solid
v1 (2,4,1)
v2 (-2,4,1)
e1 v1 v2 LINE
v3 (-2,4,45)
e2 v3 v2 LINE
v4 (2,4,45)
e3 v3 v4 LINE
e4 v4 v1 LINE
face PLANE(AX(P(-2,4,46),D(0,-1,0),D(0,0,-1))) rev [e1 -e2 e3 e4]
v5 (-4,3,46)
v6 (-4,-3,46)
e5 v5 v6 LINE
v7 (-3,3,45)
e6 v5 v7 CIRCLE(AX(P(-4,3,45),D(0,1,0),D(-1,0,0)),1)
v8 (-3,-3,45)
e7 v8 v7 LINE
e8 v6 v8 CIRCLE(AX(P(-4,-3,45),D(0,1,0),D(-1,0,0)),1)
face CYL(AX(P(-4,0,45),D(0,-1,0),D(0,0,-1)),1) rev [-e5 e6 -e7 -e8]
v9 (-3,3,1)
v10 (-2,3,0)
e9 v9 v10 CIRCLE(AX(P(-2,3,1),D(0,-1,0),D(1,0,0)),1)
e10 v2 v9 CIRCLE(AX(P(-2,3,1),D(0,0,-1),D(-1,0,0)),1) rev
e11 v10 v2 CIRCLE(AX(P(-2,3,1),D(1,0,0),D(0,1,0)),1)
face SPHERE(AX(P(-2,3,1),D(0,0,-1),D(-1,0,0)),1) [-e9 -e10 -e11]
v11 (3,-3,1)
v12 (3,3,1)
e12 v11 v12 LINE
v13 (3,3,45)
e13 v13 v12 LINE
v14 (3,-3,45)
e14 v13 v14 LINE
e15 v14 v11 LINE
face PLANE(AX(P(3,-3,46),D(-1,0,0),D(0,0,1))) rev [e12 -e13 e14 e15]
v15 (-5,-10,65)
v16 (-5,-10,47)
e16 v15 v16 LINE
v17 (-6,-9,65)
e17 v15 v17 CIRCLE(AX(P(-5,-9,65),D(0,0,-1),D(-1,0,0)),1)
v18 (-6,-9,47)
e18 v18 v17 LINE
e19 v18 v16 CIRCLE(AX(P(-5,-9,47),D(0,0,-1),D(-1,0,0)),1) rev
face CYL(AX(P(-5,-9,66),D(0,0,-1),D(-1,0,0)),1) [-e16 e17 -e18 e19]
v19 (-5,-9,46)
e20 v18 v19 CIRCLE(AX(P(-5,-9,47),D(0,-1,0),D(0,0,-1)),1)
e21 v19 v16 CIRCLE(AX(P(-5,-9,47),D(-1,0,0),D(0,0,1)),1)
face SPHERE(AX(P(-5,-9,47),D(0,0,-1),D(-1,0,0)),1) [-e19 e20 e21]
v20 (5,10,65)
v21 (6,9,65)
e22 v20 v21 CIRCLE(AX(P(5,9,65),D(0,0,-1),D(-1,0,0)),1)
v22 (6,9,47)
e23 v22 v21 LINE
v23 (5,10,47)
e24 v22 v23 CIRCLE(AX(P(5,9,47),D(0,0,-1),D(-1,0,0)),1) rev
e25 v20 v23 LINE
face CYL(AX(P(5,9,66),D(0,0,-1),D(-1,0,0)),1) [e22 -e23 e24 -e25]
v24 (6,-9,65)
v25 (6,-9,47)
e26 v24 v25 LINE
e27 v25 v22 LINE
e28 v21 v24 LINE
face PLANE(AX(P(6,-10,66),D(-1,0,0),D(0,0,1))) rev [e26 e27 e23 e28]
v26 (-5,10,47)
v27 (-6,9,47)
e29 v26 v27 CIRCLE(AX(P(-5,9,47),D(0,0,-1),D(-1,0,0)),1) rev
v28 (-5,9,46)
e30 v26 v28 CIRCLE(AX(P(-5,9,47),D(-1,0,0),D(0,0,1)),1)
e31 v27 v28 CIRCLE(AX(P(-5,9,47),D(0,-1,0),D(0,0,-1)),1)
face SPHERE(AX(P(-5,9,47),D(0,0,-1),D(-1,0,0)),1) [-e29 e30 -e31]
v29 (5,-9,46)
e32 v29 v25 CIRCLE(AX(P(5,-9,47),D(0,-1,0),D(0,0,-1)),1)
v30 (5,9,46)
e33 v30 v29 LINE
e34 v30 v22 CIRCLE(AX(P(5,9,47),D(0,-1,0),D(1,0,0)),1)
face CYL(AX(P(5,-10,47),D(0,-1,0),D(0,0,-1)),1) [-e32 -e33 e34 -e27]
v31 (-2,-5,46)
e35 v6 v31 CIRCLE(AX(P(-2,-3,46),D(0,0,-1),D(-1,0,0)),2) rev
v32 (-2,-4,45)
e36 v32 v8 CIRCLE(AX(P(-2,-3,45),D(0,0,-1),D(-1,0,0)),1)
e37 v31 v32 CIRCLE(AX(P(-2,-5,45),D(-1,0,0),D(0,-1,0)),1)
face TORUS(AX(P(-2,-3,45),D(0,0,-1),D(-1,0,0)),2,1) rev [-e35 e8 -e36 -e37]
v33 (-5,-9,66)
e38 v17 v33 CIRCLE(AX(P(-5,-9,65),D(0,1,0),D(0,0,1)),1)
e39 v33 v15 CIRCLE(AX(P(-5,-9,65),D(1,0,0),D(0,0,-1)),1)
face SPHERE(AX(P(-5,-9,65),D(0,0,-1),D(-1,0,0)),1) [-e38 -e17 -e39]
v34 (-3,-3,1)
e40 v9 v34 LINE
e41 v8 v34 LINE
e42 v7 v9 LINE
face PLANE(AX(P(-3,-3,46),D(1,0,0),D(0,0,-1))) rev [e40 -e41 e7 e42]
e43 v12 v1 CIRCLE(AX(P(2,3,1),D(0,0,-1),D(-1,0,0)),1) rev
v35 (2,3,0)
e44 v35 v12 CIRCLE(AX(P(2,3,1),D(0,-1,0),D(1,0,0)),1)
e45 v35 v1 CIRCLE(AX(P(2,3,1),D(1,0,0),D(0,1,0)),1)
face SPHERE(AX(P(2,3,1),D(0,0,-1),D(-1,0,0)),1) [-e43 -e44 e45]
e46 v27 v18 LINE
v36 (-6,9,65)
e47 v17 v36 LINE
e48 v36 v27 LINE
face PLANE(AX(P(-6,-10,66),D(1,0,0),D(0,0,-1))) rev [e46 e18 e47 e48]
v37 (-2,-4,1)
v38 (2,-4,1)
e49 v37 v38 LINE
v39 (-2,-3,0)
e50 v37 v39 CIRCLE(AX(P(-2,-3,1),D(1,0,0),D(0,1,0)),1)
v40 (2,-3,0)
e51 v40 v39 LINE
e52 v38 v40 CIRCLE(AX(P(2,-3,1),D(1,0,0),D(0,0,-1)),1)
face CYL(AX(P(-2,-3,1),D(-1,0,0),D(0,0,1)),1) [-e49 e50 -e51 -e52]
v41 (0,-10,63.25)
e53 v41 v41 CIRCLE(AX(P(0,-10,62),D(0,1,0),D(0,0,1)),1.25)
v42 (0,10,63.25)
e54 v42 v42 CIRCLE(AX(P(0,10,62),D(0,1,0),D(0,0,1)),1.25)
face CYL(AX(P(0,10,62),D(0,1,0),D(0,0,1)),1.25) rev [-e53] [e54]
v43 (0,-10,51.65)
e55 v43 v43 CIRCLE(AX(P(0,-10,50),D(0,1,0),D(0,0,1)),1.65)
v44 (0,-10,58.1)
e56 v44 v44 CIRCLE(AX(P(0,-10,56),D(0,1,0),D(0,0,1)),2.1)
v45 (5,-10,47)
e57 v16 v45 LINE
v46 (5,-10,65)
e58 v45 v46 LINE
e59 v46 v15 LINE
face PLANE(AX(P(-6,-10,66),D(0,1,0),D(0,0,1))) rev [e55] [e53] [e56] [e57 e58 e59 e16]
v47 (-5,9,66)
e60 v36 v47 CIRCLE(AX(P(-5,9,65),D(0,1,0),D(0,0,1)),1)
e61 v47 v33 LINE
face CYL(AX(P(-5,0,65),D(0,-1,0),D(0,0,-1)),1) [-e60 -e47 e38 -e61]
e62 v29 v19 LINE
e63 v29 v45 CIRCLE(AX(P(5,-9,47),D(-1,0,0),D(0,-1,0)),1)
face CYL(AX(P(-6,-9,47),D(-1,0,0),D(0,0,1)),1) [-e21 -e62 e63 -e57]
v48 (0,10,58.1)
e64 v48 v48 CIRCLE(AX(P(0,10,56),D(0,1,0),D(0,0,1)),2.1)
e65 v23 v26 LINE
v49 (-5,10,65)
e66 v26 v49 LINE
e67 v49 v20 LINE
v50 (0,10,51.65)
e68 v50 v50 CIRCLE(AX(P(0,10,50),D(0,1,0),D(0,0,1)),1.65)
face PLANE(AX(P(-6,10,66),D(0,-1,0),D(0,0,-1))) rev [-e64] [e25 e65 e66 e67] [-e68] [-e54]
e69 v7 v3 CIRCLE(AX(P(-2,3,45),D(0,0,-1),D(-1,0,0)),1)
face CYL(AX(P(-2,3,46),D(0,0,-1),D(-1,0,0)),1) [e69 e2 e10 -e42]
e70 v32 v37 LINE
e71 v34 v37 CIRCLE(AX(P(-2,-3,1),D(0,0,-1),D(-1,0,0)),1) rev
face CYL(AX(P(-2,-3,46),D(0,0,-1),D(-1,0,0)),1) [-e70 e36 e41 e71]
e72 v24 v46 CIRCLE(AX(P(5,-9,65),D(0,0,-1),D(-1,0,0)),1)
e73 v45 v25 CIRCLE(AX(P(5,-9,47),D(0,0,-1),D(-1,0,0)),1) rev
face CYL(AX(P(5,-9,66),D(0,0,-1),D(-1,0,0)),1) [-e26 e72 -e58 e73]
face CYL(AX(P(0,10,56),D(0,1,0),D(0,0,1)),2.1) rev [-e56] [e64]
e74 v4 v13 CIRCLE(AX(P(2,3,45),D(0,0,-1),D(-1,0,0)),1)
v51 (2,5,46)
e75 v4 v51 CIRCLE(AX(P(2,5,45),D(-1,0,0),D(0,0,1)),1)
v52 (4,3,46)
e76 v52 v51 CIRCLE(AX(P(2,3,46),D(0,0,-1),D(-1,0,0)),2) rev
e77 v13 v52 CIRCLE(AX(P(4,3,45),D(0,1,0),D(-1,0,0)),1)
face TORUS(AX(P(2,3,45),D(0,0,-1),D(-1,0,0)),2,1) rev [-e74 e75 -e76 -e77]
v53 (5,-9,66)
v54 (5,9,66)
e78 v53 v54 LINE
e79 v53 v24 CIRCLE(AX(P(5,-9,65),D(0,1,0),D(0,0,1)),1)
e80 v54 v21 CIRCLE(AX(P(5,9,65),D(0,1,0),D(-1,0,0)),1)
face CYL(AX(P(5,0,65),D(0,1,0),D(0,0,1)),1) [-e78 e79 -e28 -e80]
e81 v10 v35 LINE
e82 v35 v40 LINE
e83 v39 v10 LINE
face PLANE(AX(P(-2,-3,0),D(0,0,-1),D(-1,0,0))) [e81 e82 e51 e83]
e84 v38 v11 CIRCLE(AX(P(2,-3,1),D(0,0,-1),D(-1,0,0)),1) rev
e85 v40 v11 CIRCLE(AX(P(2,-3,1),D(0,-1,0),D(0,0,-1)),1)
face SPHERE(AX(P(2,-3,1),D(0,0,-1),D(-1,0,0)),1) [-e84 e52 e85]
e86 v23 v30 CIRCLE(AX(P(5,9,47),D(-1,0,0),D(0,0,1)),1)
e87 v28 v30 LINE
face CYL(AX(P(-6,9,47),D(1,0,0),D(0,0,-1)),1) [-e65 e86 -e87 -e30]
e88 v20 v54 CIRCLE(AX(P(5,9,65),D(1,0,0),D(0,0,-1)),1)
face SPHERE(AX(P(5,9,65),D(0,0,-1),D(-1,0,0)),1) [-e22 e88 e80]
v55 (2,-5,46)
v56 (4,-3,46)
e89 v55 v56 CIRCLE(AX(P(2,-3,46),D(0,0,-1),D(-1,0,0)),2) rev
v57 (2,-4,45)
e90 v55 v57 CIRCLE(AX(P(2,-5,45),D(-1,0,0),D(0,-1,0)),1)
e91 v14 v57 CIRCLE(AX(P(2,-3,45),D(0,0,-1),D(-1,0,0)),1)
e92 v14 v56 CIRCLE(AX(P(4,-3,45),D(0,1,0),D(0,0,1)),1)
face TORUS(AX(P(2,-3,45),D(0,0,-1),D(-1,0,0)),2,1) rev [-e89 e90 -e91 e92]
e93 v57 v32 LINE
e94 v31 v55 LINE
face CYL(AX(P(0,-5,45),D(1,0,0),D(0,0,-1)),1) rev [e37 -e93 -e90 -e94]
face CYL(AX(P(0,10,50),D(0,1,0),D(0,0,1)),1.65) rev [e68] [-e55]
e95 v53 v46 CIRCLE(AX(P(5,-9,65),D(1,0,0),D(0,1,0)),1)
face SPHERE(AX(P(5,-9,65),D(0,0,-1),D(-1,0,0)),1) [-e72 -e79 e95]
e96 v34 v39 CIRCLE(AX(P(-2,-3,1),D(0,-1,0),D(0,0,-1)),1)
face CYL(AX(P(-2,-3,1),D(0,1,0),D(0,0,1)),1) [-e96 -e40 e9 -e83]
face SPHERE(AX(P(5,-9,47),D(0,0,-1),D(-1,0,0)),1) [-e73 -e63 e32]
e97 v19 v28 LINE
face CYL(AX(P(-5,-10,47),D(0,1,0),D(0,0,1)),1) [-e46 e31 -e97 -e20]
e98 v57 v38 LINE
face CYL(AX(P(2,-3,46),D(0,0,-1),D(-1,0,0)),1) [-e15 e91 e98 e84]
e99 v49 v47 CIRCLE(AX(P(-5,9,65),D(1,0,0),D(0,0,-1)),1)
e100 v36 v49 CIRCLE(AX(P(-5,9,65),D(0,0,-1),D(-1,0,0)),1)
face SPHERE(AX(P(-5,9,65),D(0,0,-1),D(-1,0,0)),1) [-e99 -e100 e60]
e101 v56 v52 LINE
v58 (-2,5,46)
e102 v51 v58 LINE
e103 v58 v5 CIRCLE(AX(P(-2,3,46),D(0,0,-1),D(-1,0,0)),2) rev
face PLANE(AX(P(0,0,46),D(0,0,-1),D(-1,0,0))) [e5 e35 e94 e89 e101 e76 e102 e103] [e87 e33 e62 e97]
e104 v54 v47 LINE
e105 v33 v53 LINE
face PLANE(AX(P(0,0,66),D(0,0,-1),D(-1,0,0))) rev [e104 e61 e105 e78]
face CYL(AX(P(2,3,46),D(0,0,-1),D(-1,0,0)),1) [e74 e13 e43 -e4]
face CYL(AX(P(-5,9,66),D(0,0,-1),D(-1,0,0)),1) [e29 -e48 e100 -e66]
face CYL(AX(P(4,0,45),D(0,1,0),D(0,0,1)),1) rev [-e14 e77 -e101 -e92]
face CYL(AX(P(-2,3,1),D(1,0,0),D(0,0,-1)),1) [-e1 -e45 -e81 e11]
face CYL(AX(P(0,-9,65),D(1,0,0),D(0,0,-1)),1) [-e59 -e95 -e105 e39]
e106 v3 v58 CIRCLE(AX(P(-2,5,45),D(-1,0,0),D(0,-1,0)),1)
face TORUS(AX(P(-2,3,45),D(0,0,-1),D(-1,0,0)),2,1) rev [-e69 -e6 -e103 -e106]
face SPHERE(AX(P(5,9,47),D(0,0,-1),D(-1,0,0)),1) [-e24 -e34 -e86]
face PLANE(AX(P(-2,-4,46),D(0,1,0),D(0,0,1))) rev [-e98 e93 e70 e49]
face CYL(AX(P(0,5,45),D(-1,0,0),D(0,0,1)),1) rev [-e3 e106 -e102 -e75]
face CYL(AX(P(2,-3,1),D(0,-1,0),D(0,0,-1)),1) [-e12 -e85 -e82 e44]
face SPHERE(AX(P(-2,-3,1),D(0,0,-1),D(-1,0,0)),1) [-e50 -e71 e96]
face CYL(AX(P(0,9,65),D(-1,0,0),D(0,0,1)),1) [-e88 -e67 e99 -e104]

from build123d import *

# Parameters (mm, degrees)
EXTRUDE_1_DEPTH     = 46
EXTRUDE_2_OUTLINE_W = 12
EXTRUDE_2_OUTLINE_H = 20
EXTRUDE_2_DEPTH     = 20
FILLET_1_R          = 1
FILLET_2_R          = 1
FILLET_3_R          = 1
FILLET_4_R          = 1
FILLET_5_R          = 1
HOLE_WIZARD_M5_1_D  = 4.2
HOLE_WIZARD_M4_1_D  = 3.3
HOLE_WIZARD_M3_1_D  = 2.5


# Read off the part's stored shape, not the designer's step: 凸台-拉伸2
with BuildPart() as part:
    # 草图1 → 凸台-拉伸1 (new body)
    with BuildSketch(Plane.XY):
        with BuildLine():
            Line((-2, -4), (2, -4))
            ThreePointArc((2, -4), (2.707106781, -3.707106781), (3, -3))
            Line((3, -3), (3, 3))
            ThreePointArc((3, 3), (2.707106781, 3.707106781), (2, 4))
            Line((2, 4), (-2, 4))
            ThreePointArc((-2, 4), (-2.707106781, 3.707106781), (-3, 3))
            Line((-3, 3), (-3, -3))
            ThreePointArc((-3, -3), (-2.707106781, -3.707106781), (-2, -4))
        make_face()
    extrude(amount=EXTRUDE_1_DEPTH)

    # 凸台-拉伸2 outline → 凸台-拉伸2 (add)
    with BuildSketch(Plane.XY.offset(46)):
        Rectangle(EXTRUDE_2_OUTLINE_W, EXTRUDE_2_OUTLINE_H)
    extrude(amount=EXTRUDE_2_DEPTH)

    # 圆角1
    fillet_1_edges = [part.edges().sort_by_distance(p)[0] for p in [
        (6, -10, 56),
        (6, 10, 56),
        (-6, 10, 56),
        (-6, -10, 56),
    ]]
    fillet(fillet_1_edges, radius=FILLET_1_R)

    # 圆角2
    fillet_2_edges = [part.edges().sort_by_distance(p)[0] for p in [
        (2.707106781, -3.707106781, 46),
        (3, 0, 46),
        (2.707106781, 3.707106781, 46),
        (0, 4, 46),
        (-2.707106781, 3.707106781, 46),
        (-3, 0, 46),
        (-2.707106781, -3.707106781, 46),
        (0, -4, 46),
    ]]
    fillet(fillet_2_edges, radius=FILLET_2_R)

    # 圆角3
    fillet_3_edges = [part.edges().sort_by_distance(p)[0] for p in [
        (0, -10, 66),
        (-6, 0, 66),
        (6, 0, 66),
        (0, 10, 66),
        (-5.707106781, 9.707106781, 66),
        (5.707106781, 9.707106781, 66),
        (5.707106781, -9.707106781, 66),
        (-5.707106781, -9.707106781, 66),
    ]]
    fillet(fillet_3_edges, radius=FILLET_3_R)

    # 圆角4
    fillet_4_edges = [part.edges().sort_by_distance(p)[0] for p in [
        (0, -10, 46),
        (6, 0, 46),
        (-6, 0, 46),
        (0, 10, 46),
        (-5.707106781, 9.707106781, 46),
        (5.707106781, 9.707106781, 46),
        (5.707106781, -9.707106781, 46),
        (-5.707106781, -9.707106781, 46),
    ]]
    fillet(fillet_4_edges, radius=FILLET_4_R)

    # 圆角5
    fillet_5_edges = [part.edges().sort_by_distance(p)[0] for p in [
        (3, 0, 0),
        (2.707106781, -3.707106781, 0),
        (0, -4, 0),
        (-2.707106781, -3.707106781, 0),
        (-3, 0, 0),
        (-2.707106781, 3.707106781, 0),
        (0, 4, 0),
        (2.707106781, 3.707106781, 0),
    ]]
    fillet(fillet_5_edges, radius=FILLET_5_R)

    # M5 螺纹孔1 (through all)
    with Locations(Plane(origin=(0, 10, 0), x_dir=(1, 0, 0), z_dir=(0, 1, 0))):
        with Locations((0, -56)):
            Hole(HOLE_WIZARD_M5_1_D / 2)

    # M4 螺纹孔1 (through all)
    with Locations(Plane(origin=(0, 10, 0), x_dir=(1, 0, 0), z_dir=(0, 1, 0))):
        with Locations((0, -50)):
            Hole(HOLE_WIZARD_M4_1_D / 2)

    # M3 螺纹孔1 (through all)
    with Locations(Plane(origin=(0, 10, 0), x_dir=(1, 0, 0), z_dir=(0, 1, 0))):
        with Locations((0, -62)):
            Hole(HOLE_WIZARD_M3_1_D / 2)


solid = part.part
